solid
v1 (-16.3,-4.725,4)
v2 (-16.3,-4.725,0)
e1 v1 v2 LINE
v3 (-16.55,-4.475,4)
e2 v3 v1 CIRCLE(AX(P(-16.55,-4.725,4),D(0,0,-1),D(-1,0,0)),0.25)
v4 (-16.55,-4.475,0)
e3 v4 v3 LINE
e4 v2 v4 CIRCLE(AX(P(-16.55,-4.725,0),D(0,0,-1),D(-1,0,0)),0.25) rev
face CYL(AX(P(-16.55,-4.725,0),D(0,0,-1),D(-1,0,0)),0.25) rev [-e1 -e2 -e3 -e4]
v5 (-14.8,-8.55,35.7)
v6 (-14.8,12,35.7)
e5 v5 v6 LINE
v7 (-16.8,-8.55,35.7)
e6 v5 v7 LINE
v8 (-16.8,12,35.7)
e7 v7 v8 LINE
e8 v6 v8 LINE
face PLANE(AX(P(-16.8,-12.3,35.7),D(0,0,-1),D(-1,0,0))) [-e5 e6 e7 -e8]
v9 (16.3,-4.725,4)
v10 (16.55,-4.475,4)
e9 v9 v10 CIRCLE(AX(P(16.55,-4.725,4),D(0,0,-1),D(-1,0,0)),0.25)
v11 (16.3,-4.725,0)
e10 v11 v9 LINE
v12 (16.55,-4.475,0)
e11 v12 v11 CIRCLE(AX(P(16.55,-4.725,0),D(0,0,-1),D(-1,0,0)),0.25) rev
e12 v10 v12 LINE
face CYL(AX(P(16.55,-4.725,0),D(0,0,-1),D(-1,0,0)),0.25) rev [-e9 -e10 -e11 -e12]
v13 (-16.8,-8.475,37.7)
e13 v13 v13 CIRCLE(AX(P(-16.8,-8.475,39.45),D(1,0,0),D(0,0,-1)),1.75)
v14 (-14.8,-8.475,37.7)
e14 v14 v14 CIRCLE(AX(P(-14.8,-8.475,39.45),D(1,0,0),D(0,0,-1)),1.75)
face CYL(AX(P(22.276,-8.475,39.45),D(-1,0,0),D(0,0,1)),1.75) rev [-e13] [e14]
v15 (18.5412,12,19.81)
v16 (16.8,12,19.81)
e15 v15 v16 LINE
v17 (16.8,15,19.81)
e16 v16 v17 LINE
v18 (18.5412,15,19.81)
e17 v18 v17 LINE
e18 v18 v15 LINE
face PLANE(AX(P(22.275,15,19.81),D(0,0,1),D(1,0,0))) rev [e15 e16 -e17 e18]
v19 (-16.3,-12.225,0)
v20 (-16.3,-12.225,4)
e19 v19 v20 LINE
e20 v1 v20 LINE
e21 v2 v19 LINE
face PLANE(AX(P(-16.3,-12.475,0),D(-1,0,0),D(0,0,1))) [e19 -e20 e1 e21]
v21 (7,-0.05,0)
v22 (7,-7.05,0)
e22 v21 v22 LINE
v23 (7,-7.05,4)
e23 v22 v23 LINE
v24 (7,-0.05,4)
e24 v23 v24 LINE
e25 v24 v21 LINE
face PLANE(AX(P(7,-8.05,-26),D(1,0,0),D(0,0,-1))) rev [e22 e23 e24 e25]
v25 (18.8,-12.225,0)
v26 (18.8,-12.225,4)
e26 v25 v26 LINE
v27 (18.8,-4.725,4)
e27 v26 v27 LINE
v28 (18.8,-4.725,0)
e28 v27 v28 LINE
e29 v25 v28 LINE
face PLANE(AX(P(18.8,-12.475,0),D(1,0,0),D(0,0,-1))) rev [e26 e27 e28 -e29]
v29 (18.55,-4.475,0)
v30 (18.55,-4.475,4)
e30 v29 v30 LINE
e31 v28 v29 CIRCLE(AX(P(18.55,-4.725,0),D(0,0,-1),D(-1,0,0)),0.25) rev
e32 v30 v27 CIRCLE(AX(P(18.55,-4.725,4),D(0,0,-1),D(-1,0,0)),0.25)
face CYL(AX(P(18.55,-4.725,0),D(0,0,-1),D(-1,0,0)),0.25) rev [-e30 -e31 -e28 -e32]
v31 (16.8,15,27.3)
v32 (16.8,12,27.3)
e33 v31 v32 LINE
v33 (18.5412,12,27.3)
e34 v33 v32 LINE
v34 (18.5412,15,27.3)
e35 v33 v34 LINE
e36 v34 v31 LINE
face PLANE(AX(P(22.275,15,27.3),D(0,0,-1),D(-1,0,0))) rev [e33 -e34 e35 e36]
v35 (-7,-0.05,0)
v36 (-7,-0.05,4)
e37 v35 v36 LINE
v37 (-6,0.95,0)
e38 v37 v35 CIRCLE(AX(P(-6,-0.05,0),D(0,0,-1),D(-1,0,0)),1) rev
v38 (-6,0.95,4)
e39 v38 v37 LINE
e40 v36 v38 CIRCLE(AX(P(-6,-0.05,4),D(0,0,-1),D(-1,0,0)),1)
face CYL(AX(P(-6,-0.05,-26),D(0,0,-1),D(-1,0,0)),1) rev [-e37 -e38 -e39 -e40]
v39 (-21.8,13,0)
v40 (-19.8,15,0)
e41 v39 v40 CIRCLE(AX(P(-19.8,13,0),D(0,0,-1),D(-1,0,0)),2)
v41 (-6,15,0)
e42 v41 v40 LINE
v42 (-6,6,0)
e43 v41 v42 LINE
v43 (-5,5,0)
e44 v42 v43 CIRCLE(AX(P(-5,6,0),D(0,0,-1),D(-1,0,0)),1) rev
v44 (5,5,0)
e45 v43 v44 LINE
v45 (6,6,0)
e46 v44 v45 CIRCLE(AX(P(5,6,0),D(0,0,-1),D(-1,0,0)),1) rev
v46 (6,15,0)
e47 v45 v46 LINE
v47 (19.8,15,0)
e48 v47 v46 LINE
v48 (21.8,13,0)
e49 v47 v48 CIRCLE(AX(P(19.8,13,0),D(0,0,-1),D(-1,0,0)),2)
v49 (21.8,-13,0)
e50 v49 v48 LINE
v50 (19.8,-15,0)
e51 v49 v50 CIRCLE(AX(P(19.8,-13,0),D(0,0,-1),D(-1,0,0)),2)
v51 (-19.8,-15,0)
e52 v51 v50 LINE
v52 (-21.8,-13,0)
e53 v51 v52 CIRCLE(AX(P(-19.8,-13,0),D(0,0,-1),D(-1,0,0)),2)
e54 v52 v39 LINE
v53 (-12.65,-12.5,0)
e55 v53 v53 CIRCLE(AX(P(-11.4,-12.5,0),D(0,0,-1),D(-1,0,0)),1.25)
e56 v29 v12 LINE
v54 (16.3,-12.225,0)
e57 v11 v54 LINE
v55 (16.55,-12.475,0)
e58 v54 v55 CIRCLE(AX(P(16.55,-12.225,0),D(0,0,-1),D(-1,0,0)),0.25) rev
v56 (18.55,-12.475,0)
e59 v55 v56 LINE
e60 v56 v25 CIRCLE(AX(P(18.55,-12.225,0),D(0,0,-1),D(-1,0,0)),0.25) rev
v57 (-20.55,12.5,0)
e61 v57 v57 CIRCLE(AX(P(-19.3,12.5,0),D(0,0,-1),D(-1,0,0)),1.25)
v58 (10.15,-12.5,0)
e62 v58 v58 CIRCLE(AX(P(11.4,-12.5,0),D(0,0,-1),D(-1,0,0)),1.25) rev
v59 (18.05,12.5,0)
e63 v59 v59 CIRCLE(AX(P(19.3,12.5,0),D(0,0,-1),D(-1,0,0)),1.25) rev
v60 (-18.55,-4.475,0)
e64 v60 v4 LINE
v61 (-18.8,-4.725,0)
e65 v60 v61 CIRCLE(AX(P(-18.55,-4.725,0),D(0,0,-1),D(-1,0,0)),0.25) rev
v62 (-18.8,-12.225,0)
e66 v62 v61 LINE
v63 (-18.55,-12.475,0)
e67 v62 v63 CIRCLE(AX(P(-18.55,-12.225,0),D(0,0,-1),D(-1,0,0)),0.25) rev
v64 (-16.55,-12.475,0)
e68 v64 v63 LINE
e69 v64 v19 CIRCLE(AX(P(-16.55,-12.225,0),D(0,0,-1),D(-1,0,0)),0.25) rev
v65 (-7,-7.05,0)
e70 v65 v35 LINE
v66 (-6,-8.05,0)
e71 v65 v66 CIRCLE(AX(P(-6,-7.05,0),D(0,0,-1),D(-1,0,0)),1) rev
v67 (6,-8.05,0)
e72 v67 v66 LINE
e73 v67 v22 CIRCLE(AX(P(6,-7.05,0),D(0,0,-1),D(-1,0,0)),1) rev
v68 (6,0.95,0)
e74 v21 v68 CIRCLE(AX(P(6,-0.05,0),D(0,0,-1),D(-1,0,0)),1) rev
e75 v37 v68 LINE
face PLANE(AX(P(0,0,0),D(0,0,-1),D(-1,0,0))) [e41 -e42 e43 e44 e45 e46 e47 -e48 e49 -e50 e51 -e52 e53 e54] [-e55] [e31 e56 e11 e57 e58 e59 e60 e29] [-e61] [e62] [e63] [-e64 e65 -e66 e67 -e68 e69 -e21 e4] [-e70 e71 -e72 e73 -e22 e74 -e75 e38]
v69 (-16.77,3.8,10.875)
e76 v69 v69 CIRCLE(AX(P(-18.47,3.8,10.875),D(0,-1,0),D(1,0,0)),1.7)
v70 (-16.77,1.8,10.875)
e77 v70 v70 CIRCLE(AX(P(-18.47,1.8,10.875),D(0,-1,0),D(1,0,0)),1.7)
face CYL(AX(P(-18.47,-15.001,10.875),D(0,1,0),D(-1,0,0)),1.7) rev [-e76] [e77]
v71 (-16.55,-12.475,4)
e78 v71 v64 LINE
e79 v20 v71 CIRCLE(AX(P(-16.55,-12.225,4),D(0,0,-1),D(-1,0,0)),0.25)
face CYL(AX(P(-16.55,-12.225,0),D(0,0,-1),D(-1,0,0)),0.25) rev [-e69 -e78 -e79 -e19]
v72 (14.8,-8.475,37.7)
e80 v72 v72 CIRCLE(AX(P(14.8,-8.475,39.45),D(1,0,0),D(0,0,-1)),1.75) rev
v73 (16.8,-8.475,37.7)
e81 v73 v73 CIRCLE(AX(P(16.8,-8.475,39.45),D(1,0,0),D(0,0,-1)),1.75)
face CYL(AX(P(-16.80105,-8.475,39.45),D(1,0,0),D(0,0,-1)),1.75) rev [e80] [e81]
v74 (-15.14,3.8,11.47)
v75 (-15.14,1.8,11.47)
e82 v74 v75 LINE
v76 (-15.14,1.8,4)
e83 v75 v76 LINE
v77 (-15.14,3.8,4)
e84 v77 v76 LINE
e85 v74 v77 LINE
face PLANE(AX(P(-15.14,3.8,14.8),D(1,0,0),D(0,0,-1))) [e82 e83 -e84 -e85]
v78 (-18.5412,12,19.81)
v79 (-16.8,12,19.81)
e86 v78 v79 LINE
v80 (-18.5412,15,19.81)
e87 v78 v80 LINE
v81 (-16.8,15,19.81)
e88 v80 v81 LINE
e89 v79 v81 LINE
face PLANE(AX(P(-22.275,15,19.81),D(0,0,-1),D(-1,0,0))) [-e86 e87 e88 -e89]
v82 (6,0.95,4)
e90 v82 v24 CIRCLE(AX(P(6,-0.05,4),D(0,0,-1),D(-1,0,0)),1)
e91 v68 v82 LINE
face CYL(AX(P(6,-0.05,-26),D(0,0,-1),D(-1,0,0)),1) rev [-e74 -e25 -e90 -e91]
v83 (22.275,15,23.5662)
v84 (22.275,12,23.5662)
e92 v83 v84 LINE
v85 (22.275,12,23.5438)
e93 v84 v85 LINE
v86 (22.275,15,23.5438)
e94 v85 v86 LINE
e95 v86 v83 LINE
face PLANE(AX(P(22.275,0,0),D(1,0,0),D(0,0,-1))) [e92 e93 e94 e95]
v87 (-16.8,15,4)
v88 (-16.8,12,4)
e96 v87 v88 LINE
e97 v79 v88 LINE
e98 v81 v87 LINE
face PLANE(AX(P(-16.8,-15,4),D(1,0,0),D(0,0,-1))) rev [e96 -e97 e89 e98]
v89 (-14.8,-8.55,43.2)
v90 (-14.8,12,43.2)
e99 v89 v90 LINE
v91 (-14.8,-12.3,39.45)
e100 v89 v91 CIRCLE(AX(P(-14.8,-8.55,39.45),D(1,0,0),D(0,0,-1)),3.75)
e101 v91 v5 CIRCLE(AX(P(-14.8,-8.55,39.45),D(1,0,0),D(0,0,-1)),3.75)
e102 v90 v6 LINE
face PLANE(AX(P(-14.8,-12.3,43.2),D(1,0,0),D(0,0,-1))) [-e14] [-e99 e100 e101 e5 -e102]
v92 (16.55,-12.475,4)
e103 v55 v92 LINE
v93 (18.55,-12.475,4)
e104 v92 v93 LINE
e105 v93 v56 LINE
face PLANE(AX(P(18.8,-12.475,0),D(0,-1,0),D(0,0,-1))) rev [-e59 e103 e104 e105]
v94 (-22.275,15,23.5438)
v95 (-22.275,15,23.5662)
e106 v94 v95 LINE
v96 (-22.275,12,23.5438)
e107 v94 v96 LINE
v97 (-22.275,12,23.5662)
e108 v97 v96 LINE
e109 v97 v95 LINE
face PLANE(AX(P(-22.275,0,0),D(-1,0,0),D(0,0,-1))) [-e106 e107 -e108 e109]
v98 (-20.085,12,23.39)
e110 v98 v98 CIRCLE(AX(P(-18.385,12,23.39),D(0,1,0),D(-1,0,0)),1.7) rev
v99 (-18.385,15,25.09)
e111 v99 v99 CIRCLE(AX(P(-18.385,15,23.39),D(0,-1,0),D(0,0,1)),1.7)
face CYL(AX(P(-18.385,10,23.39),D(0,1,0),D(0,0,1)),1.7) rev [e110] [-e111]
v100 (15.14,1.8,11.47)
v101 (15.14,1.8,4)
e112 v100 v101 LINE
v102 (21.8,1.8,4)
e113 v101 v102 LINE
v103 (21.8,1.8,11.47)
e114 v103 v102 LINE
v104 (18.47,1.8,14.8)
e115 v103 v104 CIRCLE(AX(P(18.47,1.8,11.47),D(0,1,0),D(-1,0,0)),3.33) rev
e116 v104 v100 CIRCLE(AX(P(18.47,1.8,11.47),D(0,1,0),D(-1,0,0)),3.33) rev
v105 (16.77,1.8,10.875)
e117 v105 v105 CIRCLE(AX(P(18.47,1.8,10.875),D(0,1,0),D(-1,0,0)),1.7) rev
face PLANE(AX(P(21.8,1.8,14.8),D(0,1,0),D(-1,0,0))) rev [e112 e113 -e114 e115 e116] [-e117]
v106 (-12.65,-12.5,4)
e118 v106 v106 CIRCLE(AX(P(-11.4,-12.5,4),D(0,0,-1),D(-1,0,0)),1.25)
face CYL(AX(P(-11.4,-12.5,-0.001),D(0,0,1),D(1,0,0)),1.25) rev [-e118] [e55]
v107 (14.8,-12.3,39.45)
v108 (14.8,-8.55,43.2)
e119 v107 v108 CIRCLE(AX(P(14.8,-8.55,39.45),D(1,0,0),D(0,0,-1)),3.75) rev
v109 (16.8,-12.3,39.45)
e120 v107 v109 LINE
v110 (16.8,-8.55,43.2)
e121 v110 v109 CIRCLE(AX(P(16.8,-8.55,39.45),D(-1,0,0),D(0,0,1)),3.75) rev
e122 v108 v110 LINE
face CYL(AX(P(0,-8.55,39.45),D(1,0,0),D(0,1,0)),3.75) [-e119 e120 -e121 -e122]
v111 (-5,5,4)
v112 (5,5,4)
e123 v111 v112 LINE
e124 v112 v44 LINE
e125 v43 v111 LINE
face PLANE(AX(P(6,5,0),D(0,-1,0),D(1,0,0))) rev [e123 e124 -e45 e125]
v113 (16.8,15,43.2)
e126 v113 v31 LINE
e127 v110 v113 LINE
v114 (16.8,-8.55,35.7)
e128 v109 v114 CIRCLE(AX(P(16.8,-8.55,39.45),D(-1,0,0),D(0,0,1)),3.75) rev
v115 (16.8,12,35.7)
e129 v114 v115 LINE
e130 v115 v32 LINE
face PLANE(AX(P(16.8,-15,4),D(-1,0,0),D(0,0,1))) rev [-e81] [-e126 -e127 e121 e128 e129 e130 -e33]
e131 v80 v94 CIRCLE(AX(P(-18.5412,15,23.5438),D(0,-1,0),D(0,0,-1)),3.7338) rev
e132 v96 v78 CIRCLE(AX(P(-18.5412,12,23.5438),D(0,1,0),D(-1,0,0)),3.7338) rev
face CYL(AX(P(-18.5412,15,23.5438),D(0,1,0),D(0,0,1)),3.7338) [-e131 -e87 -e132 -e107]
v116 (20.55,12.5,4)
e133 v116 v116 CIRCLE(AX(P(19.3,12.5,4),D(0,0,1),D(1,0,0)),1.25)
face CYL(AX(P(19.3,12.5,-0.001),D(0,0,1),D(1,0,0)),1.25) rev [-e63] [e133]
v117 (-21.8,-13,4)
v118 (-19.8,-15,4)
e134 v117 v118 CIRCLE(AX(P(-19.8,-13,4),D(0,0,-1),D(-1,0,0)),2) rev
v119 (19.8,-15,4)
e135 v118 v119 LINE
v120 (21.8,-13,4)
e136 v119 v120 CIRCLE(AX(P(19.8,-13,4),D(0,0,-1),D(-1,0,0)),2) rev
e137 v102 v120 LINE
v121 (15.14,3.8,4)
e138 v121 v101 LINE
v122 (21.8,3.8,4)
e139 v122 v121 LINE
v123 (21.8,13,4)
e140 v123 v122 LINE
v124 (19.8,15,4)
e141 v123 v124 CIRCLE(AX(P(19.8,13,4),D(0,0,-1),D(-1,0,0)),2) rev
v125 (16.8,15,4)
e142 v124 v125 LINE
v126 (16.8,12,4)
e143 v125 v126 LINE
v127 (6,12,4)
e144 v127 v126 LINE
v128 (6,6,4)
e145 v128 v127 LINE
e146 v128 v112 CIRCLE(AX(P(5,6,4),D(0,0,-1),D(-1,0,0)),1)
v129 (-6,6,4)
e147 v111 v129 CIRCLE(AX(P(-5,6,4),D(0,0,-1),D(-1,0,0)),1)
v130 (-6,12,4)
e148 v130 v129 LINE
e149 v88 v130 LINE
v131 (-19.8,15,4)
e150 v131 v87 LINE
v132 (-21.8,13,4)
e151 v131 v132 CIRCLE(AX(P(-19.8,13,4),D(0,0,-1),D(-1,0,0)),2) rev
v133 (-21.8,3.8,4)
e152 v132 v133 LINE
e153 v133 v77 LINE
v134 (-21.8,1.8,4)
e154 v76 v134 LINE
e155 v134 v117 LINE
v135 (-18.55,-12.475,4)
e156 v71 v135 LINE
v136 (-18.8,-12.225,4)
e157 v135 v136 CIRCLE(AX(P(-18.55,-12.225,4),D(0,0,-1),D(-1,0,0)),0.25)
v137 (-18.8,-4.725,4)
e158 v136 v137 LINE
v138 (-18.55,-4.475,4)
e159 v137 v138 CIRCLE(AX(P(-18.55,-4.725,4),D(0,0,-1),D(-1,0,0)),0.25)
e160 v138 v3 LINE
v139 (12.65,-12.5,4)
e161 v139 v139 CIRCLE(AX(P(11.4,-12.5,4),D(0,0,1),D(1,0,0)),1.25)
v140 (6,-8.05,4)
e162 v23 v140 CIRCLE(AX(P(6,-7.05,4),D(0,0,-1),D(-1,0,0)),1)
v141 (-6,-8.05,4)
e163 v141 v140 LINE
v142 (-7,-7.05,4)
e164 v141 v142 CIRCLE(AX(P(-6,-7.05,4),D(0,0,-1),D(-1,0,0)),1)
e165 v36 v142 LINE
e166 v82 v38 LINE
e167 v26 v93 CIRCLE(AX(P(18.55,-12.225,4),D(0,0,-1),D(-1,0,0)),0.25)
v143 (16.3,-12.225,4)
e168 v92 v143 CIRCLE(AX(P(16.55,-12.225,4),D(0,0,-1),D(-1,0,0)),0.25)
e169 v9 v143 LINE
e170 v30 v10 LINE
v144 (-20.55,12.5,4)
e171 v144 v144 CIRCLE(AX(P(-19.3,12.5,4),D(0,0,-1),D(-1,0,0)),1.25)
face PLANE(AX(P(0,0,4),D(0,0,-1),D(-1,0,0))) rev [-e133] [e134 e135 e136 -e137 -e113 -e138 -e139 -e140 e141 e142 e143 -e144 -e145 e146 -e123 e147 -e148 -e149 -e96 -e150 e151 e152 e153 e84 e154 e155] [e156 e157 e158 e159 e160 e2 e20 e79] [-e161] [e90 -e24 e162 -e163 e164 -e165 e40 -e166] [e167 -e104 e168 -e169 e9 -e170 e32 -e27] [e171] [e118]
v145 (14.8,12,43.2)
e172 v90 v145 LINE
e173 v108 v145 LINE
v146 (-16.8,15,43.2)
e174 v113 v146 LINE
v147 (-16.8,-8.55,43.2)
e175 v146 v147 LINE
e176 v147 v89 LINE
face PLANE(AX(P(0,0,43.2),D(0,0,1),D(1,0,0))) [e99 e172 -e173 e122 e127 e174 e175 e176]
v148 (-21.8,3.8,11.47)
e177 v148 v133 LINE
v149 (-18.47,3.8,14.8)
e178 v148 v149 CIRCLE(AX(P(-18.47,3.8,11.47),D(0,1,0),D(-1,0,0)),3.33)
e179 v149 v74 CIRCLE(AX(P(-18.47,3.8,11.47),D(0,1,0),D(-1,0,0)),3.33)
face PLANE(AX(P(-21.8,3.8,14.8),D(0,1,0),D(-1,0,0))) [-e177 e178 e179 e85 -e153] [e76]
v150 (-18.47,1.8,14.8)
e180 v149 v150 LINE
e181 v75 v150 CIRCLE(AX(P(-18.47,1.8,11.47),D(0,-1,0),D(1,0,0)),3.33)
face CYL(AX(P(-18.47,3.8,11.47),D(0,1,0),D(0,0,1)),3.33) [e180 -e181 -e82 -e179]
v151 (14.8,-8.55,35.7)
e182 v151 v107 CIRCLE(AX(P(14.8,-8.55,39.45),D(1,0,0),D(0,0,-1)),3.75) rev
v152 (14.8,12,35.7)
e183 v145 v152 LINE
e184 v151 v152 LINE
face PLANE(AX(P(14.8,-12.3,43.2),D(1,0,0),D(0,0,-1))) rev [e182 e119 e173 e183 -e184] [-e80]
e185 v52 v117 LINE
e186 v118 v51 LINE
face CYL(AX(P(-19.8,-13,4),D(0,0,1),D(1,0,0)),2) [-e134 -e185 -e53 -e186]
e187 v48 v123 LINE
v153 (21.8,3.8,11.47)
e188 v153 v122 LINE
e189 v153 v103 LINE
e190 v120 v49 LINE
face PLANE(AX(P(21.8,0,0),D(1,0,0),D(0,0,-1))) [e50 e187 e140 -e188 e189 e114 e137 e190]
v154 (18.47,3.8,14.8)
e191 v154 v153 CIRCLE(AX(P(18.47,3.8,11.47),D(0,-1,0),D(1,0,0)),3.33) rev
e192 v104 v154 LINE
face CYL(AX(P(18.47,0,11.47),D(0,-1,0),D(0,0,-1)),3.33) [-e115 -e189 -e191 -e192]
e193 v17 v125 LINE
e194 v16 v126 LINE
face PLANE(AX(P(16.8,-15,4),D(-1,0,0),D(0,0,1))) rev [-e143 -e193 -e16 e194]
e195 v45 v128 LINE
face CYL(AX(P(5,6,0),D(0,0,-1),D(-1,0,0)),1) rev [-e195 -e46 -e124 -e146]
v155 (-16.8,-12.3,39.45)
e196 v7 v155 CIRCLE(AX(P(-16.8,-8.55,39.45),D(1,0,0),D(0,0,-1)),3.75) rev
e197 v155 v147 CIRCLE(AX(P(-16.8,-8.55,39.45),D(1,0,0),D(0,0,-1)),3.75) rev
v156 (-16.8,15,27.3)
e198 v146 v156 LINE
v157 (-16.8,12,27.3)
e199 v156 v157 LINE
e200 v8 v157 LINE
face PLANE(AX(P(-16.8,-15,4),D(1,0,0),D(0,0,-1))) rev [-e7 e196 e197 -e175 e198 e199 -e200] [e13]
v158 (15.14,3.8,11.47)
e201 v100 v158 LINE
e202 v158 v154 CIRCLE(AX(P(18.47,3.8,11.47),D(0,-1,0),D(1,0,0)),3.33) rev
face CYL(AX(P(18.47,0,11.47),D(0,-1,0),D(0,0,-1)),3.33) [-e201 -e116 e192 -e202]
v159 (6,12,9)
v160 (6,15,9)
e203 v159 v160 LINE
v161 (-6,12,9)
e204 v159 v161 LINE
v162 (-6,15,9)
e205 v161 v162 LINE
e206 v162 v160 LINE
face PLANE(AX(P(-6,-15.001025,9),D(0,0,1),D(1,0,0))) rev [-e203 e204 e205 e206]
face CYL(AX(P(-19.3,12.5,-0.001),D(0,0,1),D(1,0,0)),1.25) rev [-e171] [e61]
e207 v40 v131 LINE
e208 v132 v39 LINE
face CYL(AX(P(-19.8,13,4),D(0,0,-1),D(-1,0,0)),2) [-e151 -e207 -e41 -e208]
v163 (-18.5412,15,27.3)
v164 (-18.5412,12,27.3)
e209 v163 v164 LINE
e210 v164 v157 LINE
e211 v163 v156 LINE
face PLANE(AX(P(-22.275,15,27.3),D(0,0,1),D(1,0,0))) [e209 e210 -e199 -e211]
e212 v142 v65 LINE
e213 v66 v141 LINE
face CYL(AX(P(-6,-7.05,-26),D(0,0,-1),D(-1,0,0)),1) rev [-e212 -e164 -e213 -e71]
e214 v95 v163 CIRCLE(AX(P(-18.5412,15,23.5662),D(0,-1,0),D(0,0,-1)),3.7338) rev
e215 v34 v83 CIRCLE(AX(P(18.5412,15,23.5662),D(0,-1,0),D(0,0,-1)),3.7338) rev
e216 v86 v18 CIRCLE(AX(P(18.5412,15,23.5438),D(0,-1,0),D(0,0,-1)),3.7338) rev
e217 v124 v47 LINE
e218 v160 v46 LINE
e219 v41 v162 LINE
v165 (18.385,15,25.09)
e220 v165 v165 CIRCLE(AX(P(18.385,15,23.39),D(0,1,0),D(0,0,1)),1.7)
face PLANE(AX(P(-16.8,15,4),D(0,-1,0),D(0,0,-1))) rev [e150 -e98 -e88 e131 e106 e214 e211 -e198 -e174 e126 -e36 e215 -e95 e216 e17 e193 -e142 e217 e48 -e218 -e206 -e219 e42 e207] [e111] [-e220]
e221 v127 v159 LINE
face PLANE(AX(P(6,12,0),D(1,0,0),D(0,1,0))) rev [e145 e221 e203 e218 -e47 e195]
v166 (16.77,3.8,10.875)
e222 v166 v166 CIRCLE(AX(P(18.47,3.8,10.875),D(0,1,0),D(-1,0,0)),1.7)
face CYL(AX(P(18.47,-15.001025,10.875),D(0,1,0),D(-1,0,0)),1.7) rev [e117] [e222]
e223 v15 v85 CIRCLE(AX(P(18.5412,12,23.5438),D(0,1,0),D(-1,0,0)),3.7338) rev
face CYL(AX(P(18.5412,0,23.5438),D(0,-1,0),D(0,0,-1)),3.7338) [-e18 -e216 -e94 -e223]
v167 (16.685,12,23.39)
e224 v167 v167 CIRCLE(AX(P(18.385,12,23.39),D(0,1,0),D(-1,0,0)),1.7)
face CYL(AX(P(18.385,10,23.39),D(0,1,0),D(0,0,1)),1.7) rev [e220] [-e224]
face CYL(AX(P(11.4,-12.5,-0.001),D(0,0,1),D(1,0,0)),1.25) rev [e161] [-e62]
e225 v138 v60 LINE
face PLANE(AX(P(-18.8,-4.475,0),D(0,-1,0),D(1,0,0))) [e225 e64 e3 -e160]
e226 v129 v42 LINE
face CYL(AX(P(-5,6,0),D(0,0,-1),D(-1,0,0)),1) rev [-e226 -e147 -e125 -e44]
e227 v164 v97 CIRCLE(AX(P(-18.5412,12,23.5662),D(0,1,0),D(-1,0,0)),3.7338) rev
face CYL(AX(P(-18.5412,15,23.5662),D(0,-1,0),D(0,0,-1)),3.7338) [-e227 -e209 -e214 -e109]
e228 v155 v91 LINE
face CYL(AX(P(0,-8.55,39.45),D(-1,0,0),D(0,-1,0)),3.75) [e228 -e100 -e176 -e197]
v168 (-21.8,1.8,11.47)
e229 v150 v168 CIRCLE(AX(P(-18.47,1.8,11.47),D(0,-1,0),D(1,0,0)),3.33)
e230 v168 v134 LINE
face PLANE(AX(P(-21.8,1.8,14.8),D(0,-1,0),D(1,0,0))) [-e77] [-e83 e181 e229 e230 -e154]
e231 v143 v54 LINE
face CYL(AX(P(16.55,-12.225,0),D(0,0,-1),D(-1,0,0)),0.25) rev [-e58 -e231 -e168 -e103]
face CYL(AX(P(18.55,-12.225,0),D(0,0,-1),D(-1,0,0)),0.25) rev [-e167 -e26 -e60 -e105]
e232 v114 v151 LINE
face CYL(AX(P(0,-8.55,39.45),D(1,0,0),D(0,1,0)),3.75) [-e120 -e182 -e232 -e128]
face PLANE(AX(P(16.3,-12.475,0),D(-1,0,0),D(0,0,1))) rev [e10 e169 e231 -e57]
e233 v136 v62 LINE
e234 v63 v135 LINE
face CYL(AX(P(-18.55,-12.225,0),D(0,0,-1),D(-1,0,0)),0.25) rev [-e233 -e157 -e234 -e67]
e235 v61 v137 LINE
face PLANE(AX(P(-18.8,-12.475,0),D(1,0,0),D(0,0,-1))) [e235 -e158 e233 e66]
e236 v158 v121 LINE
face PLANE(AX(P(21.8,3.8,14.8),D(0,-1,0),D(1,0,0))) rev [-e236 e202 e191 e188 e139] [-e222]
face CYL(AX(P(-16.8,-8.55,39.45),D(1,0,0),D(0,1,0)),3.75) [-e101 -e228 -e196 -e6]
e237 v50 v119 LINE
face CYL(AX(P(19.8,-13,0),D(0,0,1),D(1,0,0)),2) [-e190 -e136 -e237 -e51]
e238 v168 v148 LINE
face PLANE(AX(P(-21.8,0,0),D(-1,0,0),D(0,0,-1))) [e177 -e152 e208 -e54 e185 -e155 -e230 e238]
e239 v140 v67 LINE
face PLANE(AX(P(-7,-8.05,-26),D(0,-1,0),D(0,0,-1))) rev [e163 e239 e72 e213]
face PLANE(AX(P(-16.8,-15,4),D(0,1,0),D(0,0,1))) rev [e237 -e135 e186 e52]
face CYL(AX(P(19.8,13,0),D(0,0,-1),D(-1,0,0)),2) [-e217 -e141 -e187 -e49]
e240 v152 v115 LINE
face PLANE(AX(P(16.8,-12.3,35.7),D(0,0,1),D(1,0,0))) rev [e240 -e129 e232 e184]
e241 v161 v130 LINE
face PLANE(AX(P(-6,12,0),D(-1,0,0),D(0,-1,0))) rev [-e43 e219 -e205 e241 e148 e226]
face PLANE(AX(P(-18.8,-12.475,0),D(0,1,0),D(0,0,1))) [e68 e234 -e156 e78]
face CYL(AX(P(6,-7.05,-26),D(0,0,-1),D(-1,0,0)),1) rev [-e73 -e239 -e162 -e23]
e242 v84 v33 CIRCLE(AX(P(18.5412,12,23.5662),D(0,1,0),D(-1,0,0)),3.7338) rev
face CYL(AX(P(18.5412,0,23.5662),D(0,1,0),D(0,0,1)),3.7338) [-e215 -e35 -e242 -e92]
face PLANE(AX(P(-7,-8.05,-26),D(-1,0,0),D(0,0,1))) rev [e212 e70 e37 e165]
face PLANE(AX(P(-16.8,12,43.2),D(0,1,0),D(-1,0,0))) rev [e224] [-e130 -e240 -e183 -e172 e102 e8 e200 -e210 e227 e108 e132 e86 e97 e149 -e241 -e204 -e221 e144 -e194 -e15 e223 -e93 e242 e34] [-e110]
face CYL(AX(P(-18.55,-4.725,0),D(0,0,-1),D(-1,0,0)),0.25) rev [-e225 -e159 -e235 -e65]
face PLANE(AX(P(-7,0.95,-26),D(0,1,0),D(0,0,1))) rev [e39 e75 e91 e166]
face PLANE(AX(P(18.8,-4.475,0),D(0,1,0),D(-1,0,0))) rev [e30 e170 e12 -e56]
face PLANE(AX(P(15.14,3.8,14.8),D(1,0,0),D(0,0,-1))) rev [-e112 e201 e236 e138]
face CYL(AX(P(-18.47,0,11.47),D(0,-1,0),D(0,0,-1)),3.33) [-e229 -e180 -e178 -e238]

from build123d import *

# Parameters (mm, degrees)
SKETCH1_W                = 33.6
SKETCH1_H                = 30
BOSS_EXTRUDE1_DEPTH      = 4
SKETCH3_W                = 33.6
SKETCH3_H                = 3
BOSS_EXTRUDE2_DEPTH      = 39.2
SKETCH5_W                = 14
SKETCH5_H                = 9
CUT_EXTRUDE2_DEPTH       = 30
SKETCH8_W                = 12
SKETCH8_H                = 7
CUT_EXTRUDE4_DEPTH       = 46.20929108
SKETCH10_W               = 2
SKETCH10_H               = 7.5
BOSS_EXTRUDE3_DEPTH      = 24.3
SKETCH12_W               = 4
SKETCH12_H               = 30
BOSS_EXTRUDE4_DEPTH      = 5
SKETCH13_W               = 2.5
SKETCH13_H               = 8
CUT_EXTRUDE5_DEPTH       = 48.295665763
FILLET3_R                = 0.25
FILLET4_R                = 1
CUT_EXTRUDE6_REACH       = 58.747
SKETCH15_R               = 1.75
FILLET6_R                = 3.75
CUT_EXTRUDE8_REACH       = 49.296
SKETCH23_R               = 1.25
FILLET8_R                = 2
CUT_EXTRUDE9_REACH       = 58.934
SKETCH24_W               = 12
SKETCH24_H               = 18
ESBO_O1_W                = 7.49
ESBO_O1_H                = 3
RESSALTO_EXTRUS_O1_DEPTH = 5.475
FILETE1_R                = 3.7338
FILETE2_R                = 3.7338
ESBO_O2_R                = 1.7
CORTE_EXTRUS_O1_DEPTH    = 5
ESBO_O3_W                = 6.66
ESBO_O3_H                = 2
RESSALTO_EXTRUS_O2_DEPTH = 10.8
CORTE_EXTRUS_O2_REACH    = 54.114
ESBO_O5_R                = 1.7
FILETE3_R                = 3.33
FILETE4_R                = 3.33
FILLET3_OF_ESPELHAR5_R   = 0.25
FILLET6_OF_ESPELHAR5_R   = 3.75
FILLET8_OF_ESPELHAR5_R   = 2
FILETE1_OF_ESPELHAR5_R   = 3.7338
FILETE2_OF_ESPELHAR5_R   = 3.7338
FILETE3_OF_ESPELHAR5_R   = 3.33
FILETE4_OF_ESPELHAR5_R   = 3.33


with BuildPart() as part:
    # Sketch1 → Boss-Extrude1 (new body)
    with BuildSketch(Plane.XY):
        Rectangle(SKETCH1_W, SKETCH1_H)
    extrude(amount=BOSS_EXTRUDE1_DEPTH)

    # Sketch3 → Boss-Extrude2 (add)
    with BuildSketch(Plane.XY.offset(4)):
        with Locations((0, 13.5)):
            Rectangle(SKETCH3_W, SKETCH3_H)
    extrude(amount=BOSS_EXTRUDE2_DEPTH)

    # Sketch5 → Cut-Extrude2 (cut)
    with BuildSketch(Plane.XY.offset(4)):
        with Locations((0, -3.55)):
            Rectangle(SKETCH5_W, SKETCH5_H)
    extrude(amount=-CUT_EXTRUDE2_DEPTH, mode=Mode.SUBTRACT)

    # Sketch8 → Cut-Extrude4 (cut, through all)
    with BuildSketch(Plane.XY.offset(4)):
        with Locations((0, 8.5)):
            Rectangle(SKETCH8_W, SKETCH8_H)
    extrude(amount=-CUT_EXTRUDE4_DEPTH, mode=Mode.SUBTRACT)

    # Sketch10 → Boss-Extrude3 (add)
    with BuildSketch(Plane.XZ.offset(-12)):
        with Locations((15.8, 39.45)):
            Rectangle(SKETCH10_W, SKETCH10_H)
    boss_extrude3 = extrude(amount=BOSS_EXTRUDE3_DEPTH)

    # Sketch12 → Boss-Extrude4 (add)
    with BuildSketch(Plane(origin=(16.8, 0, 0), x_dir=(0, 0, -1), z_dir=(1, 0, 0))):
        with Locations((-2, 0)):
            Rectangle(SKETCH12_W, SKETCH12_H)
    boss_extrude4 = extrude(amount=BOSS_EXTRUDE4_DEPTH)

    # Sketch13 → Cut-Extrude5 (cut, through all)
    with BuildSketch(Plane.XY.offset(4)):
        with Locations((17.55, -8.475)):
            Rectangle(SKETCH13_W, SKETCH13_H)
    cut_extrude5 = extrude(amount=-CUT_EXTRUDE5_DEPTH, mode=Mode.SUBTRACT)

    # Fillet3
    fillet3_edges = [part.edges().sort_by_distance(p)[0] for p in [
        (18.8, -4.475, 2),
        (18.8, -12.475, 2),
        (16.3, -12.475, 2),
        (16.3, -4.475, 2),
    ]]
    fillet(fillet3_edges, radius=FILLET3_R)

    # Fillet4
    fillet4_edges = [part.edges().sort_by_distance(p)[0] for p in [
        (7, 0.95, 2),
        (7, -8.05, 2),
        (-7, -8.05, 2),
        (-7, 0.95, 2),
        (6, 5, 2),
        (-6, 5, 2),
    ]]
    fillet(fillet4_edges, radius=FILLET4_R)

    # Sketch15 → Cut-Extrude6 (cut, up to next)
    with BuildSketch(Plane(origin=(16.8, 0, 0), x_dir=(0, 0, -1), z_dir=(1, 0, 0)), mode=Mode.PRIVATE) as cut_extrude6_sk1:
        with Locations((-39.45, -8.475)):
            Circle(SKETCH15_R)
    cut_extrude6_tool1 = extrude(cut_extrude6_sk1.sketch, amount=-CUT_EXTRUDE6_REACH, mode=Mode.PRIVATE) & part.part
    cut_extrude6 = cut_extrude6_tool1.solids().sort_by_distance((16.8, -8.475, 39.45))[0]
    add(cut_extrude6, mode=Mode.SUBTRACT)

    # Fillet6
    fillet6_edges = [part.edges().sort_by_distance(p)[0] for p in [
        (15.8, -12.3, 35.7),
        (15.8, -12.3, 43.2),
    ]]
    fillet(fillet6_edges, radius=FILLET6_R - 0.0001)  # a hair under: the kernel refuses the full size

    # Sketch23 → Cut-Extrude8 (cut, up to next)
    with BuildSketch(Plane.XY.offset(4), mode=Mode.PRIVATE) as cut_extrude8_sk1:
        with Locations((11.4, -12.5)):
            Circle(SKETCH23_R)
    cut_extrude8_tool1 = extrude(cut_extrude8_sk1.sketch, amount=-CUT_EXTRUDE8_REACH, mode=Mode.PRIVATE) & part.part
    # Sketch23 → Cut-Extrude8 (cut, up to next)
    with BuildSketch(Plane.XY.offset(4), mode=Mode.PRIVATE) as cut_extrude8_sk2:
        with Locations((19.3, 12.5)):
            Circle(SKETCH23_R)
    cut_extrude8_tool2 = extrude(cut_extrude8_sk2.sketch, amount=-CUT_EXTRUDE8_REACH, mode=Mode.PRIVATE) & part.part
    cut_extrude8_1 = cut_extrude8_tool1.solids().sort_by_distance((11.4, -12.5, 4))[0]
    add(cut_extrude8_1, mode=Mode.SUBTRACT)
    cut_extrude8_2 = cut_extrude8_tool2.solids().sort_by_distance((19.3, 12.5, 4))[0]
    add(cut_extrude8_2, mode=Mode.SUBTRACT)
    cut_extrude8 = cut_extrude8_1 + cut_extrude8_2  # Cut-Extrude8 as one shape, for the pattern or mirror that repeats it

    # Fillet8
    fillet8_edges = [part.edges().sort_by_distance(p)[0] for p in [
        (21.8, 15, 2),
        (21.8, -15, 2),
    ]]
    fillet(fillet8_edges, radius=FILLET8_R)

    # Sketch24 → Cut-Extrude9 (cut, up to next)
    with BuildSketch(Plane(origin=(0, 15, 0), x_dir=(1, 0, 0), z_dir=(0, 1, 0)), mode=Mode.PRIVATE) as cut_extrude9_sk1:
        Rectangle(SKETCH24_W, SKETCH24_H)
    cut_extrude9_tool1 = extrude(cut_extrude9_sk1.sketch, amount=-CUT_EXTRUDE9_REACH, mode=Mode.PRIVATE) & part.part
    add(cut_extrude9_tool1.solids().sort_by_distance((0, 15, 0))[0], mode=Mode.SUBTRACT)

    # Esboço1 → Ressalto-extrusão1 (add)
    with BuildSketch(Plane(origin=(16.8, 0, 0), x_dir=(0, 0, -1), z_dir=(1, 0, 0))):
        with Locations((-23.555, 13.5)):
            Rectangle(ESBO_O1_W, ESBO_O1_H)
    ressalto_extrus_o1 = extrude(amount=RESSALTO_EXTRUS_O1_DEPTH)

    # Filete1
    filete1_edges = [part.edges().sort_by_distance(p)[0] for p in [
        (22.275, 13.5, 27.3),
    ]]
    fillet(filete1_edges, radius=FILETE1_R)

    # Filete2
    filete2_edges = [part.edges().sort_by_distance(p)[0] for p in [
        (22.275, 13.5, 19.81),
    ]]
    fillet(filete2_edges, radius=FILETE2_R)

    # Esboço2 → Corte-extrusão1 (cut)
    with BuildSketch(Plane(origin=(0, 15, 0), x_dir=(1, 0, 0), z_dir=(0, 1, 0))):
        with Locations(Location((18.385, -23.39, 0), (0, 0, 270))):
            Circle(ESBO_O2_R)
    corte_extrus_o1 = extrude(amount=-CORTE_EXTRUS_O1_DEPTH, mode=Mode.SUBTRACT)

    # Esboço3 → Ressalto-extrusão2 (add)
    with BuildSketch(Plane.XY.offset(4)):
        with Locations((18.47, 2.8)):
            Rectangle(ESBO_O3_W, ESBO_O3_H)
    ressalto_extrus_o2 = extrude(amount=RESSALTO_EXTRUS_O2_DEPTH)

    # Esboço5 → Corte-extrusão2 (cut, up to next)
    with BuildSketch(Plane(origin=(0, 3.8, 0), x_dir=(1, 0, 0), z_dir=(0, 1, 0)), mode=Mode.PRIVATE) as corte_extrus_o2_sk1:
        with Locations(Location((18.47, -10.875, 0), (0, 0, 180))):
            Circle(ESBO_O5_R)
    corte_extrus_o2_tool1 = extrude(corte_extrus_o2_sk1.sketch, amount=-CORTE_EXTRUS_O2_REACH, mode=Mode.PRIVATE) & part.part
    corte_extrus_o2 = corte_extrus_o2_tool1.solids().sort_by_distance((18.47, 3.8, 10.875))[0]
    add(corte_extrus_o2, mode=Mode.SUBTRACT)

    # Filete3
    filete3_edges = [part.edges().sort_by_distance(p)[0] for p in [
        (21.8, 2.8, 14.8),
    ]]
    fillet(filete3_edges, radius=FILETE3_R)

    # Filete4
    filete4_edges = [part.edges().sort_by_distance(p)[0] for p in [
        (15.14, 2.8, 14.8),
    ]]
    fillet(filete4_edges, radius=FILETE4_R - 0.0001)  # a hair under: the kernel refuses the full size

    # Espelhar5: Boss-Extrude3, Boss-Extrude4, Cut-Extrude5, Cut-Extrude6, Cut-Extrude8, Ressalto-extrusão1, Corte-extrusão1, Ressalto-extrusão2, Corte-extrusão2 across plane
    add(boss_extrude3.mirror(Plane.ZY))
    add(boss_extrude4.mirror(Plane.ZY))
    add(cut_extrude5.mirror(Plane.ZY), mode=Mode.SUBTRACT)
    add(cut_extrude6.mirror(Plane.ZY), mode=Mode.SUBTRACT)
    add(cut_extrude8.mirror(Plane.ZY), mode=Mode.SUBTRACT)
    add(ressalto_extrus_o1.mirror(Plane.ZY))
    add(corte_extrus_o1.mirror(Plane.ZY), mode=Mode.SUBTRACT)
    add(ressalto_extrus_o2.mirror(Plane.ZY))
    add(corte_extrus_o2.mirror(Plane.ZY), mode=Mode.SUBTRACT)

    # Fillet3 of Espelhar5
    fillet3_of_espelhar5_edges = [part.edges().sort_by_distance(p)[0] for p in [
        (-18.8, -4.475, 2),
        (-18.8, -12.475, 2),
        (-16.3, -12.475, 2),
        (-16.3, -4.475, 2),
    ]]
    fillet(fillet3_of_espelhar5_edges, radius=FILLET3_OF_ESPELHAR5_R)

    # Fillet6 of Espelhar5
    fillet6_of_espelhar5_edges = [part.edges().sort_by_distance(p)[0] for p in [
        (-15.8, -12.3, 35.7),
        (-15.8, -12.3, 43.2),
    ]]
    fillet(fillet6_of_espelhar5_edges, radius=FILLET6_OF_ESPELHAR5_R - 0.0001)  # a hair under: the kernel refuses the full size

    # Fillet8 of Espelhar5
    fillet8_of_espelhar5_edges = [part.edges().sort_by_distance(p)[0] for p in [
        (-21.8, 15, 2),
        (-21.8, -15, 2),
    ]]
    fillet(fillet8_of_espelhar5_edges, radius=FILLET8_OF_ESPELHAR5_R)

    # Filete1 of Espelhar5
    filete1_of_espelhar5_edges = [part.edges().sort_by_distance(p)[0] for p in [
        (-22.275, 13.5, 27.3),
    ]]
    fillet(filete1_of_espelhar5_edges, radius=FILETE1_OF_ESPELHAR5_R)

    # Filete2 of Espelhar5
    filete2_of_espelhar5_edges = [part.edges().sort_by_distance(p)[0] for p in [
        (-22.275, 13.5, 19.81),
    ]]
    fillet(filete2_of_espelhar5_edges, radius=FILETE2_OF_ESPELHAR5_R)

    # Filete3 of Espelhar5
    filete3_of_espelhar5_edges = [part.edges().sort_by_distance(p)[0] for p in [
        (-21.8, 2.8, 14.8),
    ]]
    fillet(filete3_of_espelhar5_edges, radius=FILETE3_OF_ESPELHAR5_R)

    # Filete4 of Espelhar5
    filete4_of_espelhar5_edges = [part.edges().sort_by_distance(p)[0] for p in [
        (-15.14, 2.8, 14.8),
    ]]
    fillet(filete4_of_espelhar5_edges, radius=FILETE4_OF_ESPELHAR5_R - 0.0001)  # a hair under: the kernel refuses the full size


solid = part.part
